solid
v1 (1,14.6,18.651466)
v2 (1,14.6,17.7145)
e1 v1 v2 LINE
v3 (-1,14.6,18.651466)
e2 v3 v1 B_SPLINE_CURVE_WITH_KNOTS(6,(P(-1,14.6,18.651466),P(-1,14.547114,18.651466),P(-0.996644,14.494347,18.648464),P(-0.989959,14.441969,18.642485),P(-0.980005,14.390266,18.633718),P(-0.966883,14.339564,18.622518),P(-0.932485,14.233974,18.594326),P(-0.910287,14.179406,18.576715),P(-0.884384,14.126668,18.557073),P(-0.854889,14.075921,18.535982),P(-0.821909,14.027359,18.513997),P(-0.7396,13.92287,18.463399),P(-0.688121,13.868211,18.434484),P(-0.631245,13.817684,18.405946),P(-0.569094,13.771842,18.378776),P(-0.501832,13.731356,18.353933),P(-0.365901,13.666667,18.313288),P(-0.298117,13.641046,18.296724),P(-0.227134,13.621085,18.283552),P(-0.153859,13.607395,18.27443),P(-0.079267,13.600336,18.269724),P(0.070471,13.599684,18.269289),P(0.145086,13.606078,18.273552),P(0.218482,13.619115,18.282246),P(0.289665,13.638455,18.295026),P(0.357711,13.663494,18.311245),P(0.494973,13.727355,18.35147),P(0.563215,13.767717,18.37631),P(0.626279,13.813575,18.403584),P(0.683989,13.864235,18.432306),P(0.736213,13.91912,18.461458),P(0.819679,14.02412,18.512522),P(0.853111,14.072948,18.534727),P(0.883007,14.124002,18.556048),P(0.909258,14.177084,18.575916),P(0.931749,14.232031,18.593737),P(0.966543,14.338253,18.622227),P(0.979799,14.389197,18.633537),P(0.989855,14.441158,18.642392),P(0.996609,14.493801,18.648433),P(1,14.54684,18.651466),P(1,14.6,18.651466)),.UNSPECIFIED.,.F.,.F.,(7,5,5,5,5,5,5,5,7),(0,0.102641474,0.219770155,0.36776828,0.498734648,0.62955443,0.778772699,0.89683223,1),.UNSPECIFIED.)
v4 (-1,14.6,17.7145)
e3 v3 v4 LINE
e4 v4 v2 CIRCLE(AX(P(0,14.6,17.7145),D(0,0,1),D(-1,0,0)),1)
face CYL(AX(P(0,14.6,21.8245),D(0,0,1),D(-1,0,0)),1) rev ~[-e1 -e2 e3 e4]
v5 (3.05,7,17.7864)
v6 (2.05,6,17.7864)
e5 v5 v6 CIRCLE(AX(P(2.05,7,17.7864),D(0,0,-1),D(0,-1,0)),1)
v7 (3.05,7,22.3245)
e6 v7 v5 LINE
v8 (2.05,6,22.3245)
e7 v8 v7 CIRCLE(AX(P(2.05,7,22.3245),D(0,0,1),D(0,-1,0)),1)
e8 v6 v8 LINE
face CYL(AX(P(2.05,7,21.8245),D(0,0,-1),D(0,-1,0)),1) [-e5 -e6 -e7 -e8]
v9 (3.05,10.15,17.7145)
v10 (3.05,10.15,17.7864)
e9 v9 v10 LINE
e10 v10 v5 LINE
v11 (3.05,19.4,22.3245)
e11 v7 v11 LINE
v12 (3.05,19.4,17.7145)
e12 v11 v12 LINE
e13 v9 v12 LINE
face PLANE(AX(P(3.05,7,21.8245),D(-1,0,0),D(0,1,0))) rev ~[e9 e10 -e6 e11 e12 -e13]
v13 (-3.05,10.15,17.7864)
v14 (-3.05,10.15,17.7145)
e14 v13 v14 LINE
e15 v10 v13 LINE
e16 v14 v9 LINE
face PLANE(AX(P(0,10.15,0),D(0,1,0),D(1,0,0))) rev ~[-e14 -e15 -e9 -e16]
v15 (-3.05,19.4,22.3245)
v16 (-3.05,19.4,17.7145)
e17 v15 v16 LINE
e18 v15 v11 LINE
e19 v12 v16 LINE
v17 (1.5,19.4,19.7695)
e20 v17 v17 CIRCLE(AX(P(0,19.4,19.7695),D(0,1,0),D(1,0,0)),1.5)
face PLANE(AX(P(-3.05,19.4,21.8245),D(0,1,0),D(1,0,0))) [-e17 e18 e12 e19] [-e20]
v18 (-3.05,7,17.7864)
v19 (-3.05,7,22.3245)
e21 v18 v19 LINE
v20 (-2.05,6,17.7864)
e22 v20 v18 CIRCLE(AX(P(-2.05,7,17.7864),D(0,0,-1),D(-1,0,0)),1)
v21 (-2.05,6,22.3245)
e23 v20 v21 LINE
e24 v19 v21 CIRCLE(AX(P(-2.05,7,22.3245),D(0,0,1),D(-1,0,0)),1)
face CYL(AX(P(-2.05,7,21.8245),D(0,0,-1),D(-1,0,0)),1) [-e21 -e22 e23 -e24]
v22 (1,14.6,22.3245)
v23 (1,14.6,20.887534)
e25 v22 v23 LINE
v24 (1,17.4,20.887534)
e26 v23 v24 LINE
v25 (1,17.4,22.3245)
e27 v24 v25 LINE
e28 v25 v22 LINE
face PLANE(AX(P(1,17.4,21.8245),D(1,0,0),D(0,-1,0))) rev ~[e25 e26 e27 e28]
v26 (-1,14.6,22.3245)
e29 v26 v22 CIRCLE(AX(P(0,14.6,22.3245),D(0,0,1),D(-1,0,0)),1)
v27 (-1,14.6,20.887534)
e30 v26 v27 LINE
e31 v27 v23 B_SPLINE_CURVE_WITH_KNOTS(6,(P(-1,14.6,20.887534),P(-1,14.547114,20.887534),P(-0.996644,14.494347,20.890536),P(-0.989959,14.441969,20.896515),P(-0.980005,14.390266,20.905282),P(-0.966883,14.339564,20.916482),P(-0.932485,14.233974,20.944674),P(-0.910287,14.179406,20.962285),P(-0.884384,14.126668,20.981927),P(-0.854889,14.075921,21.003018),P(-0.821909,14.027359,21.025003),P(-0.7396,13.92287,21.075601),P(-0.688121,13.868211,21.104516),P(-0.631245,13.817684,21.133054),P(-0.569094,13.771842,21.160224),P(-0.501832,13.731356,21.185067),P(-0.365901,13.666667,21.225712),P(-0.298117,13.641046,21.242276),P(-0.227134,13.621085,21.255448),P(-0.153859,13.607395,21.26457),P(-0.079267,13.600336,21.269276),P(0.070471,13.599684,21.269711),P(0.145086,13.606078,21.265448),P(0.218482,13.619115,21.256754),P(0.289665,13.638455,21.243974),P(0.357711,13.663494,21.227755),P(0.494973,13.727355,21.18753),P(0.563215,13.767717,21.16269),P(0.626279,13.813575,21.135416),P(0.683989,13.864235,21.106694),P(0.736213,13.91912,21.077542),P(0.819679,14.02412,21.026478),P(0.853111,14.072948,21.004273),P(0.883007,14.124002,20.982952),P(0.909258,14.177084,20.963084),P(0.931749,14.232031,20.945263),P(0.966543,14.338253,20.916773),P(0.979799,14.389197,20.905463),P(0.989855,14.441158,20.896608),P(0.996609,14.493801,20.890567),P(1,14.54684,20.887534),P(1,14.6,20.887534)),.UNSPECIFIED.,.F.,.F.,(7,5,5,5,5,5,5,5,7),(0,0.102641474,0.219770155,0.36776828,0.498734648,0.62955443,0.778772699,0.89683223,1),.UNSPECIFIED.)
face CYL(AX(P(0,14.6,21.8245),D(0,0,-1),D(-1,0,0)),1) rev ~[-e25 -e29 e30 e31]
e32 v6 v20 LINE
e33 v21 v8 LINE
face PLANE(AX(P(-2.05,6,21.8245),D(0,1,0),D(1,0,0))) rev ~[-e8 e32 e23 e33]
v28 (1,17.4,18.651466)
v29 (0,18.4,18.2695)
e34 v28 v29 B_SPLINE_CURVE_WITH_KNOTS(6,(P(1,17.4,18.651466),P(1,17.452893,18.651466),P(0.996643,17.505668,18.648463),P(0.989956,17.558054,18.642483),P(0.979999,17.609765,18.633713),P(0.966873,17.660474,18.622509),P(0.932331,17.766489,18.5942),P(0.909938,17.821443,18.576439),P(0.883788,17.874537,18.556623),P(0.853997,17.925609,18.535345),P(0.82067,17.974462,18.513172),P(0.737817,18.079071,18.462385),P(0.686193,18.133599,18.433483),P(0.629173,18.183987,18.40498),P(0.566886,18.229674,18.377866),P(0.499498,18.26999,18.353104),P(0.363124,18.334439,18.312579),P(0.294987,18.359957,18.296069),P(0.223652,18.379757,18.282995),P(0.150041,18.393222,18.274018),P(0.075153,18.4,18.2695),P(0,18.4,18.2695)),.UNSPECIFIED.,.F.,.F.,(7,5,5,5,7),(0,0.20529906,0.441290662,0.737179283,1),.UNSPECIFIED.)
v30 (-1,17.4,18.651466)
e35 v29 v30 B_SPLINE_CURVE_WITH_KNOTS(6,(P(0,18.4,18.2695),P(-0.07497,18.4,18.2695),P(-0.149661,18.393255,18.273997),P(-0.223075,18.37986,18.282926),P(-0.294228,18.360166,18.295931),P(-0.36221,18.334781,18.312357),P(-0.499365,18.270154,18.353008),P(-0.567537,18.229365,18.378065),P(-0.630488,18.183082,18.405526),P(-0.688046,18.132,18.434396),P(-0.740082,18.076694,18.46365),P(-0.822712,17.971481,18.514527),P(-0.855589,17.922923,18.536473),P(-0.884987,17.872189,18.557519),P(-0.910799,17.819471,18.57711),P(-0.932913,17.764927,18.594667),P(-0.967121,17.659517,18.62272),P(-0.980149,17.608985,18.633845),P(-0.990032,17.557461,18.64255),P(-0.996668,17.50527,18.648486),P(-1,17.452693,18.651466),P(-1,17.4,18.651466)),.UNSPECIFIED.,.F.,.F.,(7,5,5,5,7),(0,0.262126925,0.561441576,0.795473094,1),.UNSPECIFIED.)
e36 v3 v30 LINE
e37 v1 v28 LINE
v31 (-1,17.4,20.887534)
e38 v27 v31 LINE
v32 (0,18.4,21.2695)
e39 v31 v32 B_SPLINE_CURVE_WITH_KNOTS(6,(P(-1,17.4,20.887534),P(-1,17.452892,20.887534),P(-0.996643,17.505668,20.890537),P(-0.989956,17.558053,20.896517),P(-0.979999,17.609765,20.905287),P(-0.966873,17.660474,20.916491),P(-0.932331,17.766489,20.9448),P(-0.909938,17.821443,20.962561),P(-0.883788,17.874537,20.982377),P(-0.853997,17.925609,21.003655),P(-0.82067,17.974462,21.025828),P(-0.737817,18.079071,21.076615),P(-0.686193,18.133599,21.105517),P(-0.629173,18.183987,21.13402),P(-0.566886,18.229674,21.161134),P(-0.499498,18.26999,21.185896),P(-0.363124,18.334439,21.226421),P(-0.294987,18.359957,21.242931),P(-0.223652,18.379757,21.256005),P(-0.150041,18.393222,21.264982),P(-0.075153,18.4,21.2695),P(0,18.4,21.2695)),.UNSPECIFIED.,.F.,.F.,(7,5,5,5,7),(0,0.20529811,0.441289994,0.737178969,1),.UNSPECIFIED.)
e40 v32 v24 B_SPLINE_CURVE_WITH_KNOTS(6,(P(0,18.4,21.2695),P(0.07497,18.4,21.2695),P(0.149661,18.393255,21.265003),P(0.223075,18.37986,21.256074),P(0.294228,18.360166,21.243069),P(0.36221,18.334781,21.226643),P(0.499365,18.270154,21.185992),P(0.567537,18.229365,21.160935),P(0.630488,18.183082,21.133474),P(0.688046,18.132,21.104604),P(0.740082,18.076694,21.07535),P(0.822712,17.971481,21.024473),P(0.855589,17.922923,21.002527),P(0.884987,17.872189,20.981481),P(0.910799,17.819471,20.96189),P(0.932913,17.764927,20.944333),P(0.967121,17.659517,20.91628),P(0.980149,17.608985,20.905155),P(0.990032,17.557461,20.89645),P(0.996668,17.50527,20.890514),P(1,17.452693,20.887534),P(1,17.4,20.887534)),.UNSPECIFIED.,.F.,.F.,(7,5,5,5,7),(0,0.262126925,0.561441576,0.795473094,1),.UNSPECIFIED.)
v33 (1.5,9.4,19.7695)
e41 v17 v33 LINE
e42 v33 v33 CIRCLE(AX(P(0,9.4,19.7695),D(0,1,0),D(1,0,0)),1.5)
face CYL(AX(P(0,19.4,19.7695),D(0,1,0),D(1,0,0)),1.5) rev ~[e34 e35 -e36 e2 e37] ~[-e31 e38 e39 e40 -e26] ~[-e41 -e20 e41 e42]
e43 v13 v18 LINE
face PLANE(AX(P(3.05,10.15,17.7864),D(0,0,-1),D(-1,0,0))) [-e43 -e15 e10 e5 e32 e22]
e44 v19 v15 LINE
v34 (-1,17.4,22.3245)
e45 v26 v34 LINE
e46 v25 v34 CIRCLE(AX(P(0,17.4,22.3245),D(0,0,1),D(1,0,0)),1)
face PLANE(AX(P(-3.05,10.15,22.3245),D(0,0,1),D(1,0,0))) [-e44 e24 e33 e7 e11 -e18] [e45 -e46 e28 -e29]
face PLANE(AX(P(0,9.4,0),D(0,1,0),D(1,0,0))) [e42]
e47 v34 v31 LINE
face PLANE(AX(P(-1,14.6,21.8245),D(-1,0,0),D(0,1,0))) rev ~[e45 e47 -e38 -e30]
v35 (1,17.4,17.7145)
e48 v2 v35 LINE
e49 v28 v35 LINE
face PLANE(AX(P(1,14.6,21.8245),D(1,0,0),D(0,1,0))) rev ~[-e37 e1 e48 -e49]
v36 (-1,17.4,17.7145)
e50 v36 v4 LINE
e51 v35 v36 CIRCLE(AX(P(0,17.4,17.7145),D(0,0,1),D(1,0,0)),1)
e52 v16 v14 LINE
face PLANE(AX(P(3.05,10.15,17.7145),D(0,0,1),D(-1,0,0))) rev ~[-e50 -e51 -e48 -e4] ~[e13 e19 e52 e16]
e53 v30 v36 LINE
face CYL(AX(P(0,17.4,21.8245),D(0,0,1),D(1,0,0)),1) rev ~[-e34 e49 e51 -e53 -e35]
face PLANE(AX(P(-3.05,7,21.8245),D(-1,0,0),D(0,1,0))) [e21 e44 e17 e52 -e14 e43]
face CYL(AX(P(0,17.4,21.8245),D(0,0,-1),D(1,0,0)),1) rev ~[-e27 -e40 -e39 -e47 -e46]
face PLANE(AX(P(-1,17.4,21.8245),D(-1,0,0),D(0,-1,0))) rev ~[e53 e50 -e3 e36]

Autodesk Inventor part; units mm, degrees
ref_plane "YZ Plane" through (0, 0, 0) normal (1, 0, 0) x (0, 1, 0)
ref_plane "XZ Plane" through (0, 0, 0) normal (0, 1, 0) x (-1, 0, 0)
ref_plane "XY Plane" through (0, 0, 0) normal (0, 0, 1) x (1, 0, 0)
sketch "Sketch1" plane through (0, 0, 0) normal (0, 1, 0) x (-1, 0, 0)
  line L0 (3.05, -5.3255) -> (-3.05, -5.3255)
  line L1 (-3.05, -5.3255) -> (-3.05, 4.8245)
  line L2 (-3.05, 4.8245) -> (3.05, 4.8245)
  line L3 (3.05, 4.8245) -> (3.05, -5.3255)
  line L4 (0.9, 4.8245) -> (-0.9, 4.8245)
  line L5 (0.9, 4.8245) -> (0.9, -5.3255)
  line L6 (-0.9, 4.8245) -> (-0.9, -5.3255)
  circle A0 centre (0, 3.486) radius 0.8
  circle A1 centre (-0.0087, -3.8255) radius 0.8
  line L7 (0, 4.8245) -> (0, -5.3255)
  line L8 (-3.05, 0) -> (3.05, 0)
  point P0 (0, 0)
  dimension "d13" = 6.1
  dimension "d44" = 1.8
  dimension "d45" = 2.15
  dimension "d46" = 1.6
  dimension "d47" = 1.6
extrude "Extrusion1" add sketch "Sketch1" along normal blind 10.15 contours L0 L5 L8 L3 | L0 L7 A1 L8 L5 | L8 L5 L2 L3 | L0 L6 L8 L7 A1 | L8 L7 A0 L2 L5 | L0 L1 L8 L6 | L8 L6 L2 L7 A0 | L8 L1 L2 L6
sketch "Sketch11" plane through (-3.05, 0, 4.8245) normal (0, 0, 1) x (1, 0, 0)
  point P0 (3.05, 0)
extrude "Extrusion6" add sketch "Sketch1" against normal blind 1 contours L0 L7 A1 L8 L5 | L0 L6 L8 L7 A1 | L8 L7 A0 L2 L5 | L8 L6 L2 L7 A0
sketch "Sketch12" plane through (0, 10.15, 0) normal (0, 1, 0) x (1, 0, 0)
  circle A0 centre (0.0087, 3.8255) radius 1.265
  circle A1 centre (0, -3.486) radius 1.265
  circle A2 centre (0, -3.486) radius 0.8 projected
  circle A3 centre (0.0087, 3.8255) radius 0.8 projected
  point P0 (0, 0)
  dimension "d52" = 2.53
  dimension "d53" = 2.53
extrude "Extrusion7" cut sketch "Sketch12" against normal blind 1 contours A0 | A1 | A2 | A3
sketch "Sketch13" plane through (-3.05, 10.15, 4.8245) normal (0, 0, 1) x (1, 0, 0)
  line L0 (0, 0) -> (0, -4.15)
  line L1 (0, -10.15) -> (0, 0) projected
  line L2 (0, -4.15) -> (6.1, -4.15)
  line L3 (6.1, -10.15) -> (6.1, 0) projected
  line L4 (6.1, 0) -> (6.1, -4.15)
  line L5 (0, 0) -> (6.1, 0)
  point P0 (3.05, -10.15)
  dimension "d56" = 4.15
extrude "Extrusion8" add sketch "Sketch13" along normal blind 17
sketch "Sketch17" plane through (-3.05, 10.15, 21.8245) normal (0, 0, 1) x (1, 0, 0)
  line L0 (6.1, 0) -> (0, 0) projected
  line L1 (6.1, 0) -> (14.3904, 5.5919)
  line L2 (6.1, 0) -> (16.1, 0) construction
  line L3 (14.3904, 5.5919) -> (10.1964, 11.8097)
  line L4 (10.1964, 11.8097) -> (13.5955, 14.1024)
  line L5 (13.5955, 14.1024) -> (17.7894, 7.8846)
  line L6 (17.7894, 7.8846) -> (19.7132, 5.0325)
  line L7 (6.1, -10.15) -> (6.1, -4.15) projected
  line L8 (19.7132, 5.0325) -> (6.1, -4.15)
  line L9 (6.1, 0) -> (6.1, -4.15)
  point P0 (3.05, -10.15)
  dimension "d72" = 10
  dimension "d73" = 34
  dimension "d74" = 7.5
  dimension "d75" = 4.1
extrude "Extrusion12" [suppressed]
sketch "Sketch14" plane through (0, 10.15, 0) normal (0, 1, 0) x (1, 0, 0)
  line L0 (3.05, 5.3255) -> (3.05, -21.8245) projected
  line L1 (3.05, -21.8245) -> (3.05, -17.7145)
  line L2 (3.05, -17.7145) -> (-3.05, -17.7145)
  line L3 (-3.05, 5.3255) -> (-3.05, -21.8245) projected
  line L4 (-3.05, -21.8245) -> (3.05, -21.8245)
  point P0 (0, 0)
  dimension "d59" = 4.11
extrude "Extrusion9" add sketch "Sketch14" along normal blind 9.25
sketch "Sketch16" plane through (0, 19.4, 0) normal (0, 1, 0) x (1, 0, 0)
  circle A0 centre (0, -19.7695) radius 1.5
  line L0 (-3.05, -21.8245) -> (3.05, -21.8245) projected
  line L1 (3.05, -21.8245) -> (3.05, -17.7145) projected
  point P0 (0, 0)
  point P1 (0, -21.8245)
  dimension "d67" = 3
  dimension "d68" = 2.055
  dimension "d69" = 3.05
extrude "Extrusion11" cut sketch "Sketch16" against normal blind 10
sketch "Sketch15" plane through (-3.05, 10.15, 21.8245) normal (0, 0, 1) x (1, 0, 0)
  line L0 (3.05, 7.25) -> (3.05, 4.45) construction
  line L1 (6.1, 0) -> (6.1, 9.25) projected
  line L2 (2.05, 7.25) -> (2.05, 4.45)
  line L3 (4.05, 4.45) -> (4.05, 7.25)
  arc A0 (4.05, 7.25) -> (2.05, 7.25) centre (3.05, 7.25) ccw
  arc A1 (2.05, 4.45) -> (4.05, 4.45) centre (3.05, 4.45) ccw
  line L4 (0, 9.25) -> (6.1, 9.25) projected
  line L5 (3.05, 9.25) -> (3.05, 8.25)
  point P0 (3.05, -10.15)
  point P1 (3.05, 5.85)
  dimension "d62" = 1.4
  dimension "d63" = 2
  dimension "d64" = 3.05
  dimension "d94" = 2.05
  dimension "d97" = 1
extrude "Extrusion10" cut sketch "Sketch15" against normal through all
sketch "Sketch20" plane through (10.5455, 24.2524, 21.8245) normal (-0.5591929, 0.8290376, 0) x (0.8290376, 0.5591929, 0)
  circle A0 centre (-2.05, 2.05) radius 1.5
  line L0 (-4.1, 0) -> (-4.1, 4.1) projected
  line L1 (0, 0) -> (-4.1, 0) projected
  point P0 (-22.3044, 21.8245)
  point P1 (-2.05, 0)
  dimension "d82" = 3
  dimension "d83" = 2.05
  dimension "d84" = 2.05
extrude "Extrusion14" [suppressed]
sketch "Sketch18" plane through (-3.05, 10.15, 21.8245) normal (0, 0, 1) x (1, 0, 0)
  line L0 (12.6984, 11.7664) -> (14.2641, 9.4451) construction
  line L1 (11.973, 11.2771) -> (13.5387, 8.9558)
  line L2 (14.9895, 9.9344) -> (13.4238, 12.2557)
  arc A0 (13.4238, 12.2557) -> (11.973, 11.2771) centre (12.6984, 11.7664) ccw
  arc A1 (13.5387, 8.9558) -> (14.9895, 9.9344) centre (14.2641, 9.4451) ccw
  line L3 (19.7132, 5.0325) -> (13.5955, 14.1024) projected
  line L4 (10.1964, 11.8097) -> (13.5955, 14.1024) projected
  point P0 (3.05, -10.15)
  point P1 (13.4813, 10.6057)
  point P2 (12.2091, 12.4918)
  dimension "d78" = 1.4
  dimension "d79" = 1.75
  dimension "d89" = 0.56
  dimension "d90" = 2.05
extrude "Extrusion13" cut sketch "Sketch18" against normal blind 4.1
sketch "Sketch21" plane through (13.8787, 15.6447, 19.7745) normal (-0.5591929, 0.8290376, 0) x (0.8290376, 0.5591929, 0)
  circle A0 centre (0, 0) radius 0.868
  point P0 (-20.2544, 19.7745)
extrude "Extrusion15" [suppressed]
mirror "Mirror3" about plane through (0, 0, 0) normal (1, 0, 0) of "Extrusion13"
fillet "Fillet1" radius 1 2 edges at (3.05, 10.15, 6.1945) (-3.05, 10.15, 6.1945)
fillet "Fillet2" [suppressed]
fillet "Fillet3" radius 1 2 edges at (3.05, 6, 13.3245) (-3.05, 6, 13.3245)
sketch "Sketch33" plane through (-3.05, 10.15, 21.8245) normal (0, 0, 1) x (1, 0, 0)
  line L0 (4.05, 7.25) -> (4.05, 4.45) projected
  arc A0 (2.05, 4.45) -> (4.05, 4.45) centre (3.05, 4.45) ccw projected
  line L1 (2.05, 4.45) -> (2.05, 7.25) projected
  arc A1 (4.05, 7.25) -> (2.05, 7.25) centre (3.05, 7.25) ccw projected
  arc A2 (0, -3.15) -> (1, -4.15) centre (1, -3.15) ccw projected
  line L2 (1, -4.15) -> (5.1, -4.15) projected
  arc A3 (5.1, -4.15) -> (6.1, -3.15) centre (5.1, -3.15) ccw projected
  line L3 (6.1, -3.15) -> (6.1, 9.25) projected
  line L4 (0, 9.25) -> (6.1, 9.25) projected
  line L5 (0, -3.15) -> (0, 9.25) projected
  point P0 (3.05, -10.15)
extrude "Extrusion17" add sketch "Sketch33" along normal blind 0.5
sketch "Sketch36" plane through (0, 10.15, 0) normal (0, 1, 0) x (1, 0, 0)
  line L0 (3.05, -17.7145) -> (3.05, 5.3255) projected
  line L1 (-3.5916, 5.3255) -> (3.05, 5.3255)
  line L2 (3.05, 5.3255) -> (3.05, -17.7864)
  line L3 (3.05, -17.7864) -> (-3.5916, -17.7864)
  line L4 (-3.5916, -17.7864) -> (-3.5916, 5.3255)
  point P0 (0, 0)
  point P1 (3.05, 5.3255)
extrude "Extrusion18" cut sketch "Sketch36" against normal through all
sketch "Sketch22" plane through (0, 9.4, 19.7695) normal (0, 1, 0) x (1, 0, 0)
  circle A0 centre (0, 0) radius 1.5 projected
  point P0 (0, 19.7695)
extrude "Extrusion16" [suppressed]
equation "\"d13\" = base_width"
equation "\"d45\" = -0.5 * d44 + 0.5 * d13"
equation "\"d4\" = base_length"
equation "\"base_width\" = 6.1"
equation "\"base_length\" = 10.15"
equation "\"base_screw_diameter\" = 1.5"
equation "\"base_screw_spacing_edge\" = 8.5"
equation "\"multi_angle\" = 34deg"
properties part number "reinforced_holder"
